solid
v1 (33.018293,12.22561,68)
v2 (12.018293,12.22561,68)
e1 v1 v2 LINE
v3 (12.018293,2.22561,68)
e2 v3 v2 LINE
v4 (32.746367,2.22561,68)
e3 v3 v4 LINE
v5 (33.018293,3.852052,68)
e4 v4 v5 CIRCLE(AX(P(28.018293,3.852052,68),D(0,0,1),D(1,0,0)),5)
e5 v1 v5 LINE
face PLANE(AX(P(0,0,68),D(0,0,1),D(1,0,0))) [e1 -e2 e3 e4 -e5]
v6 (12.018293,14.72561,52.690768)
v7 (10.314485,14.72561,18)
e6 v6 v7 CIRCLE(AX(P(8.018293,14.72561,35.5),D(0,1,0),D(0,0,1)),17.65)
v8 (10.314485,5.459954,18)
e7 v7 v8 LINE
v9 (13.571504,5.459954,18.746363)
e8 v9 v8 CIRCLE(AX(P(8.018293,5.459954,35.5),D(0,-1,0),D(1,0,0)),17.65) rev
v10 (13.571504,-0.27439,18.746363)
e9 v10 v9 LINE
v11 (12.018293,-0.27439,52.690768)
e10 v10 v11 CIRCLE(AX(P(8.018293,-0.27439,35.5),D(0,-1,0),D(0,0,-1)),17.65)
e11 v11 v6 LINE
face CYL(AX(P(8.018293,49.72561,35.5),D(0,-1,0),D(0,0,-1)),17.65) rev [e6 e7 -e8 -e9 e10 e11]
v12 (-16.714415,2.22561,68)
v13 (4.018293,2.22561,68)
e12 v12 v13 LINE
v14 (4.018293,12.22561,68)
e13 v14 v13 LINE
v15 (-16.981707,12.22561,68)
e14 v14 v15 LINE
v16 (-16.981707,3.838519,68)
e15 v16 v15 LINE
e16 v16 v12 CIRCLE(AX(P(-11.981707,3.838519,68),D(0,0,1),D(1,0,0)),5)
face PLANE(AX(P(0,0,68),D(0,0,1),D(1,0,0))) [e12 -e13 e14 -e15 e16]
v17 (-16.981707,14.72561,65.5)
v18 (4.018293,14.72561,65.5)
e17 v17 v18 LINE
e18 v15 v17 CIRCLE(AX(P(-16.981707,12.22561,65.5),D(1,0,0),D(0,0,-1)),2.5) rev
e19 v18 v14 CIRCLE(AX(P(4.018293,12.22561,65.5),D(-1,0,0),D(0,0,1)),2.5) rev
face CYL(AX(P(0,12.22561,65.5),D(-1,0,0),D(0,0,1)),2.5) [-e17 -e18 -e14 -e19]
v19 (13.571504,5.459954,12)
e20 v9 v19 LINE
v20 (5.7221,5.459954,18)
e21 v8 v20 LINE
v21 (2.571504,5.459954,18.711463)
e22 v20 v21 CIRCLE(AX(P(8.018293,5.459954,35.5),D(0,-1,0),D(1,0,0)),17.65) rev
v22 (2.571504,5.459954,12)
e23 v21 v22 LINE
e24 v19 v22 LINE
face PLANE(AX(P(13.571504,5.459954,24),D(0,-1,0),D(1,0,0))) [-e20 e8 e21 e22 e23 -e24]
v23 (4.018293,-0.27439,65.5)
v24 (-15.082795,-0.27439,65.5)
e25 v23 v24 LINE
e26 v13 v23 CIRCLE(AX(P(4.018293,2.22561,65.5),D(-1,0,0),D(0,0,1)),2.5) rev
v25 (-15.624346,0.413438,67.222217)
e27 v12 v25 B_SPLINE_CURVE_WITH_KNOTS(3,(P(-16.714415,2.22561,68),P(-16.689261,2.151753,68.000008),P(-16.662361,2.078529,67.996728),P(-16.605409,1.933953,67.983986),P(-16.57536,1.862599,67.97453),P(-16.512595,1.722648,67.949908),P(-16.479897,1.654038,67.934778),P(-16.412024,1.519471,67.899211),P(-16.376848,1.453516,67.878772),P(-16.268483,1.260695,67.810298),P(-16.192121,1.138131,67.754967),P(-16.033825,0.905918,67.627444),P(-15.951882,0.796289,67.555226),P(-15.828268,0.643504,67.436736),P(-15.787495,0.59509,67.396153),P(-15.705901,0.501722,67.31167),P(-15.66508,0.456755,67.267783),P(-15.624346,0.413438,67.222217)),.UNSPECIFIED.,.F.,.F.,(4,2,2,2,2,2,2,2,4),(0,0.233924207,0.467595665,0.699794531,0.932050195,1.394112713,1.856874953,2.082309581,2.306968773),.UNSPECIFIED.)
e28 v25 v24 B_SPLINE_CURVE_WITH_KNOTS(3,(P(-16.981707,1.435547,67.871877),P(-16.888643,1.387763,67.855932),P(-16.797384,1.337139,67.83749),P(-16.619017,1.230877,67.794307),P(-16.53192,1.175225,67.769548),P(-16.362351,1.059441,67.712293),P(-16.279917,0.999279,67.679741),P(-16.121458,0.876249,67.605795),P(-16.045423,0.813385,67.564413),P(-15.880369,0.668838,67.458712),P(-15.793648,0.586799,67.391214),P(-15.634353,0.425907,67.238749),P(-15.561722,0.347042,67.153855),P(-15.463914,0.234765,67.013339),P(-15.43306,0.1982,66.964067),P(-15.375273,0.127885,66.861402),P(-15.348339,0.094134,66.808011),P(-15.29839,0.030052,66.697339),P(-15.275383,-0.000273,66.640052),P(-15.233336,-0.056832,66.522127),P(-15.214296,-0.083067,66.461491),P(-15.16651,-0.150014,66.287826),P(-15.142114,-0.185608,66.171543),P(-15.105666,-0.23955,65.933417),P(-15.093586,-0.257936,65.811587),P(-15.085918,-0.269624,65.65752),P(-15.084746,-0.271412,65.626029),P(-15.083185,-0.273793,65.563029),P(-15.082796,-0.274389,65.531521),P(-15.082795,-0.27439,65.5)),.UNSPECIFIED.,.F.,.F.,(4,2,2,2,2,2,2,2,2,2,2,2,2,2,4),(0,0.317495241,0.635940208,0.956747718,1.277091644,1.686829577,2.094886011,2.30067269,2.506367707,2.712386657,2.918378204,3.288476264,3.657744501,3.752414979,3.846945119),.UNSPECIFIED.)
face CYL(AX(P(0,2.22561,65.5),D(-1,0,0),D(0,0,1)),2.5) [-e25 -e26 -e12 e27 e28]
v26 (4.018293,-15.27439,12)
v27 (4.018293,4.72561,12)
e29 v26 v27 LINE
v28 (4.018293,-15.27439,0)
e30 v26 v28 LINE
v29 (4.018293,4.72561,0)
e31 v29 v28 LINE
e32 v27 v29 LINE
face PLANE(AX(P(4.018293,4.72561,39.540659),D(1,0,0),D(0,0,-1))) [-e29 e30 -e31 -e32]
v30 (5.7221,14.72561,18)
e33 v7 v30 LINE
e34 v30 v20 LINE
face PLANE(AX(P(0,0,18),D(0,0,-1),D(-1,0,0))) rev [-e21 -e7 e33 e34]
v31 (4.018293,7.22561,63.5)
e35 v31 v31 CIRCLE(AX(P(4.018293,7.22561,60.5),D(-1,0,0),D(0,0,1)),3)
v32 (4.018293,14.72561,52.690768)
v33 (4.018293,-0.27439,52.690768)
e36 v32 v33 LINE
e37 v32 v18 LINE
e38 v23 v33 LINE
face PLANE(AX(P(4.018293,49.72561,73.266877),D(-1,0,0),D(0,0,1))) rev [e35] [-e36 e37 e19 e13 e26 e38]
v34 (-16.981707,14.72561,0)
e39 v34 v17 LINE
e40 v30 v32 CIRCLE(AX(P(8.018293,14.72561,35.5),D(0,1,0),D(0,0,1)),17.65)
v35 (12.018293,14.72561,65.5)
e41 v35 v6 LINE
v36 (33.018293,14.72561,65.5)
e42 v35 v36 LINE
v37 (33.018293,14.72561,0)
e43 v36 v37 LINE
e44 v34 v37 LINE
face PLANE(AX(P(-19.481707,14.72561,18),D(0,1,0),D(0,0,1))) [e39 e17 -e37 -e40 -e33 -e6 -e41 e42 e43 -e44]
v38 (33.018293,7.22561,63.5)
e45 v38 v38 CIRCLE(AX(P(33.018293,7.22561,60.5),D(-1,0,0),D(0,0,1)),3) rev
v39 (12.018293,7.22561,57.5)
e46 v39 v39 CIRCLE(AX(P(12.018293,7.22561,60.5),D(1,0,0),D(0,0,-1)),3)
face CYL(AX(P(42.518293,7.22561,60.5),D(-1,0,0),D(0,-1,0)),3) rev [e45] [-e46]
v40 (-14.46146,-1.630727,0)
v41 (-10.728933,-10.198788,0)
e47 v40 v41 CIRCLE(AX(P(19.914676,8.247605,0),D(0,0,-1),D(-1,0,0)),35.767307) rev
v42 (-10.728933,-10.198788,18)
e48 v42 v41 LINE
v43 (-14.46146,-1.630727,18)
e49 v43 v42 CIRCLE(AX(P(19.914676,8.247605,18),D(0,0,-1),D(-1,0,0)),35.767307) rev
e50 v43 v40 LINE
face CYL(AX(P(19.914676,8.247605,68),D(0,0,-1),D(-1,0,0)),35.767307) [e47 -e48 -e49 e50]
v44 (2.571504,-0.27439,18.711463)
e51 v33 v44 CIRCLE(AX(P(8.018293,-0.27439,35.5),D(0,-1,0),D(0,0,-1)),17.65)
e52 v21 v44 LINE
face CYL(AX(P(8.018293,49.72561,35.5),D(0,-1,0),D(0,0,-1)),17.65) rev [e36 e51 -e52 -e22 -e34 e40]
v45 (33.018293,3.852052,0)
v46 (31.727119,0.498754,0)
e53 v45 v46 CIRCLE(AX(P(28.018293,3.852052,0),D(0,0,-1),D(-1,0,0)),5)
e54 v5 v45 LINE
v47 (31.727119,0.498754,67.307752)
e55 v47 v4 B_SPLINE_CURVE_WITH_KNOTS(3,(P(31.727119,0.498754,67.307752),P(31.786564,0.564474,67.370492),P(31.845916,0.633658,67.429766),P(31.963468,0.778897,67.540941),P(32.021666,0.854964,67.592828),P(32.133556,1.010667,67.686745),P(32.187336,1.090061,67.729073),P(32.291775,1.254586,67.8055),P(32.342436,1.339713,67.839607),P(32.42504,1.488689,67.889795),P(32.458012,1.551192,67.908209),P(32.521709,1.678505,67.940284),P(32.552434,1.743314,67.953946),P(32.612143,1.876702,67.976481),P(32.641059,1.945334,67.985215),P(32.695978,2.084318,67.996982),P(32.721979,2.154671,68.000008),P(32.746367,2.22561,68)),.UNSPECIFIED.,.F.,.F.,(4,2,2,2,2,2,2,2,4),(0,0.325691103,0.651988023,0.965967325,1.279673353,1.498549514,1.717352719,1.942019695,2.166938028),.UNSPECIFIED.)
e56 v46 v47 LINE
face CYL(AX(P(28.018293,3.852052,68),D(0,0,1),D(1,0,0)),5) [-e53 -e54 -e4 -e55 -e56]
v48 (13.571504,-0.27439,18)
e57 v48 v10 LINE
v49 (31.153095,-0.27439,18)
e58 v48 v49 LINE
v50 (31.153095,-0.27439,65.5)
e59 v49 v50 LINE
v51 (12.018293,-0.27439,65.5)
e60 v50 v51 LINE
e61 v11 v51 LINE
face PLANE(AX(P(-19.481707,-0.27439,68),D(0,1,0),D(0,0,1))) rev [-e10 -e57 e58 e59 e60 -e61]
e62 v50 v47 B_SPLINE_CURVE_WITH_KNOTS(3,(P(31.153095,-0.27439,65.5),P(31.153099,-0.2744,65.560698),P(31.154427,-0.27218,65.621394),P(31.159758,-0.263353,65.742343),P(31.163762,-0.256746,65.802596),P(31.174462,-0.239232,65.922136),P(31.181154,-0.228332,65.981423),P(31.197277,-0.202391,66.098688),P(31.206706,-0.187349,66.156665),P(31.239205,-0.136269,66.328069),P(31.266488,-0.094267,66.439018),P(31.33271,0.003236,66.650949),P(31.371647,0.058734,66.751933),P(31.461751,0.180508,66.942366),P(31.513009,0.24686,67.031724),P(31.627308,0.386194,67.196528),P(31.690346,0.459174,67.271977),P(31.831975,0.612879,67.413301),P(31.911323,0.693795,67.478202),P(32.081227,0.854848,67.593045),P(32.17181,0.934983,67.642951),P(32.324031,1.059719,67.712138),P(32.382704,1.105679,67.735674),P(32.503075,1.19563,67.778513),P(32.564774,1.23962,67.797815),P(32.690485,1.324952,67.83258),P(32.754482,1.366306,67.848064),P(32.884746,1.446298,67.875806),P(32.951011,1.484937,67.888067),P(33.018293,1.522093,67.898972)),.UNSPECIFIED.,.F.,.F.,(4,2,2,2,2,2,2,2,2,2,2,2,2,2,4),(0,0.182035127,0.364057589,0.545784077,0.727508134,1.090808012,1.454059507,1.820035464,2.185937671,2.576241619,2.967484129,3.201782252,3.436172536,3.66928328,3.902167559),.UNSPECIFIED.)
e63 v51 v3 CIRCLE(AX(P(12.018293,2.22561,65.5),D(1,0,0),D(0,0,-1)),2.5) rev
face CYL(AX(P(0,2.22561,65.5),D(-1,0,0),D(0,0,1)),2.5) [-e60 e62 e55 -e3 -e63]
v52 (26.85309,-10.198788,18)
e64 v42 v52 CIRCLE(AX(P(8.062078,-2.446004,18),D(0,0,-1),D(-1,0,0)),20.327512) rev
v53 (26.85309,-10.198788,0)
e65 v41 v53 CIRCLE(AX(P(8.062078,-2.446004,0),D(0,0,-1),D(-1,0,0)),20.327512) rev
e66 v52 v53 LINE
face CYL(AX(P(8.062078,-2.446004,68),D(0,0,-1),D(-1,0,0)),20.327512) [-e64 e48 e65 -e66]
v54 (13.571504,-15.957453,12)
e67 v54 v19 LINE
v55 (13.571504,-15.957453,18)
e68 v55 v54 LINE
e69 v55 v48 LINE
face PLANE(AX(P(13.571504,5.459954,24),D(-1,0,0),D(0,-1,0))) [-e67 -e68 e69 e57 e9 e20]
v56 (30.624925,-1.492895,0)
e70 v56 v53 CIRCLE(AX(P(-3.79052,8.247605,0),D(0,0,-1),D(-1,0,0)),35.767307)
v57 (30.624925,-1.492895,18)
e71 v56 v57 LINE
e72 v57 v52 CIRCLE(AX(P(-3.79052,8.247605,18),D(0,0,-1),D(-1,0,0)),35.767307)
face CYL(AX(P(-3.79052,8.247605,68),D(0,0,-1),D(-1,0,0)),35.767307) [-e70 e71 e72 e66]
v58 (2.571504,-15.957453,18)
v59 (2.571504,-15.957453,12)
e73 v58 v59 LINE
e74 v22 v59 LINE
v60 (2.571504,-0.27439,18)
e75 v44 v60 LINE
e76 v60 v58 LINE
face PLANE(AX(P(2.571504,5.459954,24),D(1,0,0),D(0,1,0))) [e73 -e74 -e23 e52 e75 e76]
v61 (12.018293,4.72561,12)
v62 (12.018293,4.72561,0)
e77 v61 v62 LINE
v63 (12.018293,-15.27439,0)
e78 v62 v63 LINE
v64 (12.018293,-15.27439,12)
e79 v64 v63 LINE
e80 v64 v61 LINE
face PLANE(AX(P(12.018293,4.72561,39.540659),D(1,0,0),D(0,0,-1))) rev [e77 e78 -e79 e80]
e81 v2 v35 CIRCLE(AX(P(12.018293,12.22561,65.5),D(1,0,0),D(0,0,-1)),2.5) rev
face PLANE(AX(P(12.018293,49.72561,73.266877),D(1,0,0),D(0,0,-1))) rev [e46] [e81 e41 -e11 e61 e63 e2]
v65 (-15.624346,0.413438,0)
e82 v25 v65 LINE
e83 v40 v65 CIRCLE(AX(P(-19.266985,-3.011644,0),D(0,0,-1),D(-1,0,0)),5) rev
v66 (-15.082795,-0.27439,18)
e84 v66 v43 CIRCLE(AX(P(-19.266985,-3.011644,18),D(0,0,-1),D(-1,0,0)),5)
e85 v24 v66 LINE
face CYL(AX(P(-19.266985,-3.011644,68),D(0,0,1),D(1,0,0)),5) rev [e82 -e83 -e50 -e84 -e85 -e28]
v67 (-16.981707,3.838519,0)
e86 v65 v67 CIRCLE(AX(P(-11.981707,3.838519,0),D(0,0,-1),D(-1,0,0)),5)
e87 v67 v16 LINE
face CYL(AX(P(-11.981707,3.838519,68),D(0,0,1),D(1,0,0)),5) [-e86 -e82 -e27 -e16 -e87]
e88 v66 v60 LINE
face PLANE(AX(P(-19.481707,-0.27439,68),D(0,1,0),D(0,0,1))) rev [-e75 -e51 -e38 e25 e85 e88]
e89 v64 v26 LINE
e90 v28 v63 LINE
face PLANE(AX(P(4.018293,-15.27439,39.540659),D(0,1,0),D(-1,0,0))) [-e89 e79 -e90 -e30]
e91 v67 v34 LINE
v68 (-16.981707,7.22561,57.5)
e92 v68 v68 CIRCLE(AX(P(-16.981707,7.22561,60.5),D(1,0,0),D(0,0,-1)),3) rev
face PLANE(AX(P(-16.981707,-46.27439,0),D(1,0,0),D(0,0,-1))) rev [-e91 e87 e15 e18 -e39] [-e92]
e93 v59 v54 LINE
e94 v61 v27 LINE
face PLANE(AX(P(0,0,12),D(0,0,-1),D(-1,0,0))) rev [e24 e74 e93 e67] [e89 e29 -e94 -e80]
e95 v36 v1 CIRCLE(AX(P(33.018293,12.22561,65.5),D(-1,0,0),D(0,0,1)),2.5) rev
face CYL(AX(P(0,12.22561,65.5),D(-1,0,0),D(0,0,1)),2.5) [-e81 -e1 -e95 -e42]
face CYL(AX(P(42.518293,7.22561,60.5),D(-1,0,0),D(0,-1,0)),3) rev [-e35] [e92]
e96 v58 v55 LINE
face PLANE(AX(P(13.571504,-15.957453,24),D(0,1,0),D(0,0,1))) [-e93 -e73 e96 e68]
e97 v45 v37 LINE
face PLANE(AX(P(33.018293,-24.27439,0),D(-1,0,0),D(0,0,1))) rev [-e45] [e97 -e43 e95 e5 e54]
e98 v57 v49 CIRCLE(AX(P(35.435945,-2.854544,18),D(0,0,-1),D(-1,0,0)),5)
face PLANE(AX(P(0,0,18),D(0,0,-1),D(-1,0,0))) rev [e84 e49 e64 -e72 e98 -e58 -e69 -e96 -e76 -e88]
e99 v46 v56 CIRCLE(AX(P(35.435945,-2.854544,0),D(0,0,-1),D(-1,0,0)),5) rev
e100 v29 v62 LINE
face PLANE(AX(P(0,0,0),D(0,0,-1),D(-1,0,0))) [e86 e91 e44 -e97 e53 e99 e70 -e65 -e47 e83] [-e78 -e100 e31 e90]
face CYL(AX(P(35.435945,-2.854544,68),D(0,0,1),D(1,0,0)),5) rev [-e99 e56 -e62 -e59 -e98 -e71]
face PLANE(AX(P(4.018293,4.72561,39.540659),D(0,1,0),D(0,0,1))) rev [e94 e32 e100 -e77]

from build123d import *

# Parameters (mm, degrees)
SKETCH1_W               = 55
SKETCH1_H               = 40
BOSS_EXTRUDE1_DEPTH     = 18
SKETCH2_W               = 55
SKETCH2_H               = 15
BOSS_EXTRUDE2_DEPTH     = 50
CUT_EXTRUDE1_START      = -15
CUT_EXTRUDE1_DEPTH      = 15
SKETCH4_W               = 8
SKETCH4_H               = 40.233753348
CUT_EXTRUDE2_DEPTH      = 50
SKETCH6_R               = 3
CUT_EXTRUDE3_DEPTH      = 62
SKETCH7_W               = 8
SKETCH7_H               = 20
CUT_EXTRUDE4_DEPTH      = 18
CUT_EXTRUDE5_DEPTH      = 6
CUT_EXTRUDE5_DEPTH_BACK = 6
SKETCH8_W               = 11
SKETCH8_H               = 21.417406175
FILLET1_R               = 2.5
CUT_EXTRUDE6_DEPTH      = 67.335088131
CUT_EXTRUDE6_DEPTH_BACK = 67.335088131
CUT_EXTRUDE7_DEPTH      = 61
CUT_EXTRUDE8_DEPTH      = 39
FILLET2_R               = 20
CUT_EXTRUDE9_DEPTH      = 80.705724129
CUT_EXTRUDE9_DEPTH_BACK = 80.705724129
FILLET4_DEPTH           = 68
FILLET4_2_DEPTH         = 18
FILLET4_START           = -18
FILLET4_3_DEPTH         = 52
FILLET5_R               = 5


with BuildPart() as part:
    # Sketch1 → Boss-Extrude1 (new body)
    with BuildSketch(Plane.XY):
        with Locations((8.018292683, -5.274390244)):
            Rectangle(SKETCH1_W, SKETCH1_H)
    extrude(amount=BOSS_EXTRUDE1_DEPTH)

    # Sketch2 → Boss-Extrude2 (add)
    with BuildSketch(Plane.XY.offset(18)):
        with Locations((8.018292683, 7.225609756)):
            Rectangle(SKETCH2_W, SKETCH2_H)
    extrude(amount=BOSS_EXTRUDE2_DEPTH)

    # Cut-Extrude1: read off the stored shape, not the designer's step
    # Cut-Extrude1 outline → Cut-Extrude1 (cut)
    with BuildSketch(Plane(origin=(0, -0.274390244, 0), x_dir=(-1, 0, 0), z_dir=(0, -1, 0)).offset(CUT_EXTRUDE1_START)):
        with BuildLine():
            ThreePointArc((-10.314485184, -18), (-8.018292683, -53.15), (-5.722100182, -18))
            Line((-5.722100182, -18), (-10.314485184, -18))
        make_face()
    extrude(amount=CUT_EXTRUDE1_DEPTH, mode=Mode.SUBTRACT)

    # Sketch4 → Cut-Extrude2 (cut)
    with BuildSketch(Plane(origin=(0, -0.274390244, 0), x_dir=(-1, 0, 0), z_dir=(0, -1, 0))):
        with Locations((-8.018292683, -53.15)):
            Rectangle(SKETCH4_W, SKETCH4_H)
    extrude(amount=-CUT_EXTRUDE2_DEPTH, mode=Mode.SUBTRACT)

    # Sketch6 → Cut-Extrude3 (cut)
    with BuildSketch(Plane.ZY.offset(19.481707317)):
        with Locations(Location((60.5, 7.225609756, 0), (0, 0, 270))):
            Circle(SKETCH6_R)
    extrude(amount=-CUT_EXTRUDE3_DEPTH, mode=Mode.SUBTRACT)

    # Sketch7 → Cut-Extrude4 (cut)
    with BuildSketch(Plane(origin=(0, 0, 0), x_dir=(-1, 0, 0), z_dir=(0, 0, -1))):
        with Locations((-8.018292683, -5.274390244)):
            Rectangle(SKETCH7_W, SKETCH7_H)
    extrude(amount=-CUT_EXTRUDE4_DEPTH, mode=Mode.SUBTRACT)

    # Sketch8 → Cut-Extrude5 (cut, two sides: drawn at the far end of the back side and taken through both)
    with BuildSketch(Plane.XY.offset(18).offset(-CUT_EXTRUDE5_DEPTH_BACK)):
        with Locations((8.071503624, -5.248749455)):
            Rectangle(SKETCH8_W, SKETCH8_H)
    extrude(amount=CUT_EXTRUDE5_DEPTH + CUT_EXTRUDE5_DEPTH_BACK, mode=Mode.SUBTRACT)

    # Fillet1
    fillet1_edges = [part.edges().sort_by_distance(p)[0] for p in [
        (35.518292683, -12.774390244, 18),
        (-19.481707317, -12.774390244, 18),
        (-19.481707317, -0.274390244, 43),
        (35.518292683, -0.274390244, 43),
        (-7.731707317, -0.274390244, 68),
        (23.768292683, 14.725609756, 68),
        (8.018292683, -25.274390244, 18),
        (23.768292683, -0.274390244, 68),
        (-7.731707317, 14.725609756, 68),
        (-19.481707317, 14.725609756, 34),
        (35.518292683, 14.725609756, 34),
    ]]
    fillet(fillet1_edges, radius=FILLET1_R)

    # Sketch10 → Cut-Extrude6 (cut, two sides: drawn at the far end of the back side and taken through both)
    with BuildSketch(Plane.XY.offset(18).offset(-CUT_EXTRUDE6_DEPTH_BACK)):
        with BuildLine():
            ThreePointArc((-3.438146554, -22.774390244), (-11.4271438, -17.219826727), (-16.981707317, -9.230829481))
            Line((-16.981707317, -9.230829481), (-16.981707317, -22.774390244))
            Line((-16.981707317, -22.774390244), (-3.438146554, -22.774390244))
        make_face()
        with BuildLine():
            ThreePointArc((-16.981707317, -9.230829481), (-18.849438892, -3.637409944), (-19.481707317, 2.225609756))
            Line((-19.481707317, 2.225609756), (-19.481707317, -25.274390244))
            Line((-19.481707317, -25.274390244), (8.018292683, -25.274390244))
            ThreePointArc((8.018292683, -25.274390244), (2.155272983, -24.642121819), (-3.438146554, -22.774390244))
            Line((-3.438146554, -22.774390244), (-16.981707317, -22.774390244))
            Line((-16.981707317, -22.774390244), (-16.981707317, -9.230829481))
        make_face()
        with BuildLine():
            ThreePointArc((19.47473192, -22.774390244), (13.881312383, -24.642121819), (8.018292683, -25.274390244))
            Line((8.018292683, -25.274390244), (35.518292683, -25.274390244))
            Line((35.518292683, -25.274390244), (35.518292683, 2.225609756))
            ThreePointArc((35.518292683, 2.225609756), (34.886024258, -3.637409944), (33.018292683, -9.230829481))
            Line((33.018292683, -9.230829481), (33.018292683, -22.774390244))
            Line((33.018292683, -22.774390244), (19.47473192, -22.774390244))
        make_face()
        with BuildLine():
            ThreePointArc((33.018292683, -9.230829481), (27.463729166, -17.219826727), (19.47473192, -22.774390244))
            Line((19.47473192, -22.774390244), (33.018292683, -22.774390244))
            Line((33.018292683, -22.774390244), (33.018292683, -9.230829481))
        make_face()
    extrude(amount=CUT_EXTRUDE6_DEPTH + CUT_EXTRUDE6_DEPTH_BACK, mode=Mode.SUBTRACT)

    # Sketch11 → Cut-Extrude7 (cut)
    with BuildSketch(Plane(origin=(0, 14.725609756, 0), x_dir=(1, 0, 0), z_dir=(0, 1, 0))):
        Polygon((-16.981707317, -68), (-16.981707317, 0), (-29.965472326, 0), (-29.965472326, -73.975211298), (-16.981707317, -73.975211298), align=None)
    extrude(amount=-CUT_EXTRUDE7_DEPTH, mode=Mode.SUBTRACT)

    # Sketch12 → Cut-Extrude8 (cut)
    with BuildSketch(Plane(origin=(0, 14.725609756, 0), x_dir=(1, 0, 0), z_dir=(0, 1, 0))):
        Polygon((33.018292683, -34), (33.018292683, -69.603278632), (51.263623859, -69.603278632), (51.263623859, -68), (51.263623859, 5.657942166), (48.966322657, 5.657942166), (33.018292683, 5.657942166), align=None)
    extrude(amount=-CUT_EXTRUDE8_DEPTH, mode=Mode.SUBTRACT)

    # Fillet2
    fillet2_edges = [part.edges().sort_by_distance(p)[0] for p in [
        (-16.981707317, -9.230829481, 9),
        (33.018292683, -9.230829481, 9),
    ]]
    fillet(fillet2_edges, radius=FILLET2_R)

    # Sketch13 → Cut-Extrude9 (cut, two sides: drawn at the far end of the back side and taken through both)
    with BuildSketch(Plane(origin=(0, 0, 0), x_dir=(-1, 0, 0), z_dir=(0, 0, -1)).offset(-CUT_EXTRUDE9_DEPTH_BACK)):
        with BuildLine():
            Line((15.409844247, 2.637038383), (21.378631307, -1.925347001))
            Line((21.378631307, -1.925347001), (18.152736662, -25.695120221))
            Line((18.152736662, -25.695120221), (-4.693551269, -34.090790667))
            Line((-4.693551269, -34.090790667), (-38.816552793, -29.459816409))
            Line((-38.816552793, -29.459816409), (-43.750527307, -6.539564186))
            Line((-43.750527307, -6.539564186), (-31.534000974, 2.637038383))
            ThreePointArc((-31.534000974, 2.637038383), (-29.812131381, -4.006457809), (-26.853089861, -10.198787729))
            ThreePointArc((-26.853089861, -10.198787729), (-8.062078363, -22.773516814), (10.728933135, -10.198787729))
            ThreePointArc((10.728933135, -10.198787729), (13.687974655, -4.006457809), (15.409844247, 2.637038383))
        make_face()
    extrude(amount=CUT_EXTRUDE9_DEPTH + CUT_EXTRUDE9_DEPTH_BACK, mode=Mode.SUBTRACT)

    # Fillet4: read off the stored shape, not the designer's step
    # Fillet4 outline → Fillet4 (add)
    with BuildSketch(Plane.XY):
        with BuildLine():
            ThreePointArc((31.153095191, -0.274390244), (31.967368862, 0.746702465), (33.018292683, 1.52209337))
            Line((33.018292683, 1.52209337), (31.534000974, 2.637038383))
            ThreePointArc((31.534000974, 2.637038383), (31.270593615, 1.175225559), (30.946719887, -0.274390244))
            Line((30.946719887, -0.274390244), (31.153095191, -0.274390244))
        make_face()
        with BuildLine():
            ThreePointArc((-16.981707317, 1.435547188), (-15.921170685, 0.70393524), (-15.08279533, -0.274390244))
            Line((-15.08279533, -0.274390244), (-14.82256316, -0.274390244))
            ThreePointArc((-14.82256316, -0.274390244), (-15.146436888, 1.175225559), (-15.409844247, 2.637038383))
            Line((-15.409844247, 2.637038383), (-16.981707317, 1.435547188))
        make_face()
    extrude(amount=FILLET4_DEPTH)

    # Fillet4 2 outline → Fillet4 2 (add)
    with BuildSketch(Plane.XY):
        with BuildLine():
            ThreePointArc((30.624925491, -1.492895434), (30.848374458, -0.866028928), (31.153095191, -0.274390244))
            Line((31.153095191, -0.274390244), (30.946719887, -0.274390244))
            ThreePointArc((30.946719887, -0.274390244), (30.791189941, -0.885060274), (30.624925491, -1.492895434))
        make_face()
        with BuildLine():
            ThreePointArc((-15.08279533, -0.274390244), (-14.721255817, -0.92925432), (-14.461460233, -1.63072708))
            ThreePointArc((-14.461460233, -1.63072708), (-14.648665519, -0.954330135), (-14.82256316, -0.274390244))
            Line((-14.82256316, -0.274390244), (-15.08279533, -0.274390244))
        make_face()
    extrude(amount=FILLET4_2_DEPTH)

    # Fillet4 3 outline → Fillet4 3 (cut)
    with BuildSketch(Plane.YZ.offset(FILLET4_START)):
        with BuildLine():
            Line((-0.274390244, 68), (-0.274390244, 65.5))
            ThreePointArc((-0.274390244, 65.5), (0.457842803, 67.267766953), (2.225609756, 68))
            Line((2.225609756, 68), (-0.274390244, 68))
        make_face()
    extrude(amount=FILLET4_3_DEPTH, mode=Mode.SUBTRACT)

    # Fillet5
    # the kernel refuses this fillet: 5 mm, written as the material it takes off along each edge
    with BuildSketch(Plane(origin=(33.018292683, 1.52209337, 73.723867582), x_dir=(0, 1, 0), z_dir=(0, 0, -1))) as fillet5_piece_1:
        with BuildLine():
            CenterArc((2.329958397, -5), FILLET5_R, 90, 42.117992045)
            ThreePointArc((-1.023339511, -1.291173616), (-0.45812273, -0.688026327), (0, 0))
            Line((0, 0), (2.329958397, 0))
        make_face()
    extrude(amount=79.548763574, mode=Mode.SUBTRACT)
    with BuildSketch(Plane(origin=(-16.981707317, 1.435547188, -6.007429576), x_dir=(0, 1, 0), z_dir=(0, 0, 1))) as fillet5_piece_2:
        with BuildLine():
            CenterArc((2.40297183, -5), FILLET5_R, 90, 43.236885439)
            ThreePointArc((-1.022109439, -1.357361081), (-0.452973163, -0.72241666), (0, 0))
            Line((0, 0), (2.40297183, 0))
        make_face()
    extrude(amount=79.886736286, mode=Mode.SUBTRACT)


solid = part.part
